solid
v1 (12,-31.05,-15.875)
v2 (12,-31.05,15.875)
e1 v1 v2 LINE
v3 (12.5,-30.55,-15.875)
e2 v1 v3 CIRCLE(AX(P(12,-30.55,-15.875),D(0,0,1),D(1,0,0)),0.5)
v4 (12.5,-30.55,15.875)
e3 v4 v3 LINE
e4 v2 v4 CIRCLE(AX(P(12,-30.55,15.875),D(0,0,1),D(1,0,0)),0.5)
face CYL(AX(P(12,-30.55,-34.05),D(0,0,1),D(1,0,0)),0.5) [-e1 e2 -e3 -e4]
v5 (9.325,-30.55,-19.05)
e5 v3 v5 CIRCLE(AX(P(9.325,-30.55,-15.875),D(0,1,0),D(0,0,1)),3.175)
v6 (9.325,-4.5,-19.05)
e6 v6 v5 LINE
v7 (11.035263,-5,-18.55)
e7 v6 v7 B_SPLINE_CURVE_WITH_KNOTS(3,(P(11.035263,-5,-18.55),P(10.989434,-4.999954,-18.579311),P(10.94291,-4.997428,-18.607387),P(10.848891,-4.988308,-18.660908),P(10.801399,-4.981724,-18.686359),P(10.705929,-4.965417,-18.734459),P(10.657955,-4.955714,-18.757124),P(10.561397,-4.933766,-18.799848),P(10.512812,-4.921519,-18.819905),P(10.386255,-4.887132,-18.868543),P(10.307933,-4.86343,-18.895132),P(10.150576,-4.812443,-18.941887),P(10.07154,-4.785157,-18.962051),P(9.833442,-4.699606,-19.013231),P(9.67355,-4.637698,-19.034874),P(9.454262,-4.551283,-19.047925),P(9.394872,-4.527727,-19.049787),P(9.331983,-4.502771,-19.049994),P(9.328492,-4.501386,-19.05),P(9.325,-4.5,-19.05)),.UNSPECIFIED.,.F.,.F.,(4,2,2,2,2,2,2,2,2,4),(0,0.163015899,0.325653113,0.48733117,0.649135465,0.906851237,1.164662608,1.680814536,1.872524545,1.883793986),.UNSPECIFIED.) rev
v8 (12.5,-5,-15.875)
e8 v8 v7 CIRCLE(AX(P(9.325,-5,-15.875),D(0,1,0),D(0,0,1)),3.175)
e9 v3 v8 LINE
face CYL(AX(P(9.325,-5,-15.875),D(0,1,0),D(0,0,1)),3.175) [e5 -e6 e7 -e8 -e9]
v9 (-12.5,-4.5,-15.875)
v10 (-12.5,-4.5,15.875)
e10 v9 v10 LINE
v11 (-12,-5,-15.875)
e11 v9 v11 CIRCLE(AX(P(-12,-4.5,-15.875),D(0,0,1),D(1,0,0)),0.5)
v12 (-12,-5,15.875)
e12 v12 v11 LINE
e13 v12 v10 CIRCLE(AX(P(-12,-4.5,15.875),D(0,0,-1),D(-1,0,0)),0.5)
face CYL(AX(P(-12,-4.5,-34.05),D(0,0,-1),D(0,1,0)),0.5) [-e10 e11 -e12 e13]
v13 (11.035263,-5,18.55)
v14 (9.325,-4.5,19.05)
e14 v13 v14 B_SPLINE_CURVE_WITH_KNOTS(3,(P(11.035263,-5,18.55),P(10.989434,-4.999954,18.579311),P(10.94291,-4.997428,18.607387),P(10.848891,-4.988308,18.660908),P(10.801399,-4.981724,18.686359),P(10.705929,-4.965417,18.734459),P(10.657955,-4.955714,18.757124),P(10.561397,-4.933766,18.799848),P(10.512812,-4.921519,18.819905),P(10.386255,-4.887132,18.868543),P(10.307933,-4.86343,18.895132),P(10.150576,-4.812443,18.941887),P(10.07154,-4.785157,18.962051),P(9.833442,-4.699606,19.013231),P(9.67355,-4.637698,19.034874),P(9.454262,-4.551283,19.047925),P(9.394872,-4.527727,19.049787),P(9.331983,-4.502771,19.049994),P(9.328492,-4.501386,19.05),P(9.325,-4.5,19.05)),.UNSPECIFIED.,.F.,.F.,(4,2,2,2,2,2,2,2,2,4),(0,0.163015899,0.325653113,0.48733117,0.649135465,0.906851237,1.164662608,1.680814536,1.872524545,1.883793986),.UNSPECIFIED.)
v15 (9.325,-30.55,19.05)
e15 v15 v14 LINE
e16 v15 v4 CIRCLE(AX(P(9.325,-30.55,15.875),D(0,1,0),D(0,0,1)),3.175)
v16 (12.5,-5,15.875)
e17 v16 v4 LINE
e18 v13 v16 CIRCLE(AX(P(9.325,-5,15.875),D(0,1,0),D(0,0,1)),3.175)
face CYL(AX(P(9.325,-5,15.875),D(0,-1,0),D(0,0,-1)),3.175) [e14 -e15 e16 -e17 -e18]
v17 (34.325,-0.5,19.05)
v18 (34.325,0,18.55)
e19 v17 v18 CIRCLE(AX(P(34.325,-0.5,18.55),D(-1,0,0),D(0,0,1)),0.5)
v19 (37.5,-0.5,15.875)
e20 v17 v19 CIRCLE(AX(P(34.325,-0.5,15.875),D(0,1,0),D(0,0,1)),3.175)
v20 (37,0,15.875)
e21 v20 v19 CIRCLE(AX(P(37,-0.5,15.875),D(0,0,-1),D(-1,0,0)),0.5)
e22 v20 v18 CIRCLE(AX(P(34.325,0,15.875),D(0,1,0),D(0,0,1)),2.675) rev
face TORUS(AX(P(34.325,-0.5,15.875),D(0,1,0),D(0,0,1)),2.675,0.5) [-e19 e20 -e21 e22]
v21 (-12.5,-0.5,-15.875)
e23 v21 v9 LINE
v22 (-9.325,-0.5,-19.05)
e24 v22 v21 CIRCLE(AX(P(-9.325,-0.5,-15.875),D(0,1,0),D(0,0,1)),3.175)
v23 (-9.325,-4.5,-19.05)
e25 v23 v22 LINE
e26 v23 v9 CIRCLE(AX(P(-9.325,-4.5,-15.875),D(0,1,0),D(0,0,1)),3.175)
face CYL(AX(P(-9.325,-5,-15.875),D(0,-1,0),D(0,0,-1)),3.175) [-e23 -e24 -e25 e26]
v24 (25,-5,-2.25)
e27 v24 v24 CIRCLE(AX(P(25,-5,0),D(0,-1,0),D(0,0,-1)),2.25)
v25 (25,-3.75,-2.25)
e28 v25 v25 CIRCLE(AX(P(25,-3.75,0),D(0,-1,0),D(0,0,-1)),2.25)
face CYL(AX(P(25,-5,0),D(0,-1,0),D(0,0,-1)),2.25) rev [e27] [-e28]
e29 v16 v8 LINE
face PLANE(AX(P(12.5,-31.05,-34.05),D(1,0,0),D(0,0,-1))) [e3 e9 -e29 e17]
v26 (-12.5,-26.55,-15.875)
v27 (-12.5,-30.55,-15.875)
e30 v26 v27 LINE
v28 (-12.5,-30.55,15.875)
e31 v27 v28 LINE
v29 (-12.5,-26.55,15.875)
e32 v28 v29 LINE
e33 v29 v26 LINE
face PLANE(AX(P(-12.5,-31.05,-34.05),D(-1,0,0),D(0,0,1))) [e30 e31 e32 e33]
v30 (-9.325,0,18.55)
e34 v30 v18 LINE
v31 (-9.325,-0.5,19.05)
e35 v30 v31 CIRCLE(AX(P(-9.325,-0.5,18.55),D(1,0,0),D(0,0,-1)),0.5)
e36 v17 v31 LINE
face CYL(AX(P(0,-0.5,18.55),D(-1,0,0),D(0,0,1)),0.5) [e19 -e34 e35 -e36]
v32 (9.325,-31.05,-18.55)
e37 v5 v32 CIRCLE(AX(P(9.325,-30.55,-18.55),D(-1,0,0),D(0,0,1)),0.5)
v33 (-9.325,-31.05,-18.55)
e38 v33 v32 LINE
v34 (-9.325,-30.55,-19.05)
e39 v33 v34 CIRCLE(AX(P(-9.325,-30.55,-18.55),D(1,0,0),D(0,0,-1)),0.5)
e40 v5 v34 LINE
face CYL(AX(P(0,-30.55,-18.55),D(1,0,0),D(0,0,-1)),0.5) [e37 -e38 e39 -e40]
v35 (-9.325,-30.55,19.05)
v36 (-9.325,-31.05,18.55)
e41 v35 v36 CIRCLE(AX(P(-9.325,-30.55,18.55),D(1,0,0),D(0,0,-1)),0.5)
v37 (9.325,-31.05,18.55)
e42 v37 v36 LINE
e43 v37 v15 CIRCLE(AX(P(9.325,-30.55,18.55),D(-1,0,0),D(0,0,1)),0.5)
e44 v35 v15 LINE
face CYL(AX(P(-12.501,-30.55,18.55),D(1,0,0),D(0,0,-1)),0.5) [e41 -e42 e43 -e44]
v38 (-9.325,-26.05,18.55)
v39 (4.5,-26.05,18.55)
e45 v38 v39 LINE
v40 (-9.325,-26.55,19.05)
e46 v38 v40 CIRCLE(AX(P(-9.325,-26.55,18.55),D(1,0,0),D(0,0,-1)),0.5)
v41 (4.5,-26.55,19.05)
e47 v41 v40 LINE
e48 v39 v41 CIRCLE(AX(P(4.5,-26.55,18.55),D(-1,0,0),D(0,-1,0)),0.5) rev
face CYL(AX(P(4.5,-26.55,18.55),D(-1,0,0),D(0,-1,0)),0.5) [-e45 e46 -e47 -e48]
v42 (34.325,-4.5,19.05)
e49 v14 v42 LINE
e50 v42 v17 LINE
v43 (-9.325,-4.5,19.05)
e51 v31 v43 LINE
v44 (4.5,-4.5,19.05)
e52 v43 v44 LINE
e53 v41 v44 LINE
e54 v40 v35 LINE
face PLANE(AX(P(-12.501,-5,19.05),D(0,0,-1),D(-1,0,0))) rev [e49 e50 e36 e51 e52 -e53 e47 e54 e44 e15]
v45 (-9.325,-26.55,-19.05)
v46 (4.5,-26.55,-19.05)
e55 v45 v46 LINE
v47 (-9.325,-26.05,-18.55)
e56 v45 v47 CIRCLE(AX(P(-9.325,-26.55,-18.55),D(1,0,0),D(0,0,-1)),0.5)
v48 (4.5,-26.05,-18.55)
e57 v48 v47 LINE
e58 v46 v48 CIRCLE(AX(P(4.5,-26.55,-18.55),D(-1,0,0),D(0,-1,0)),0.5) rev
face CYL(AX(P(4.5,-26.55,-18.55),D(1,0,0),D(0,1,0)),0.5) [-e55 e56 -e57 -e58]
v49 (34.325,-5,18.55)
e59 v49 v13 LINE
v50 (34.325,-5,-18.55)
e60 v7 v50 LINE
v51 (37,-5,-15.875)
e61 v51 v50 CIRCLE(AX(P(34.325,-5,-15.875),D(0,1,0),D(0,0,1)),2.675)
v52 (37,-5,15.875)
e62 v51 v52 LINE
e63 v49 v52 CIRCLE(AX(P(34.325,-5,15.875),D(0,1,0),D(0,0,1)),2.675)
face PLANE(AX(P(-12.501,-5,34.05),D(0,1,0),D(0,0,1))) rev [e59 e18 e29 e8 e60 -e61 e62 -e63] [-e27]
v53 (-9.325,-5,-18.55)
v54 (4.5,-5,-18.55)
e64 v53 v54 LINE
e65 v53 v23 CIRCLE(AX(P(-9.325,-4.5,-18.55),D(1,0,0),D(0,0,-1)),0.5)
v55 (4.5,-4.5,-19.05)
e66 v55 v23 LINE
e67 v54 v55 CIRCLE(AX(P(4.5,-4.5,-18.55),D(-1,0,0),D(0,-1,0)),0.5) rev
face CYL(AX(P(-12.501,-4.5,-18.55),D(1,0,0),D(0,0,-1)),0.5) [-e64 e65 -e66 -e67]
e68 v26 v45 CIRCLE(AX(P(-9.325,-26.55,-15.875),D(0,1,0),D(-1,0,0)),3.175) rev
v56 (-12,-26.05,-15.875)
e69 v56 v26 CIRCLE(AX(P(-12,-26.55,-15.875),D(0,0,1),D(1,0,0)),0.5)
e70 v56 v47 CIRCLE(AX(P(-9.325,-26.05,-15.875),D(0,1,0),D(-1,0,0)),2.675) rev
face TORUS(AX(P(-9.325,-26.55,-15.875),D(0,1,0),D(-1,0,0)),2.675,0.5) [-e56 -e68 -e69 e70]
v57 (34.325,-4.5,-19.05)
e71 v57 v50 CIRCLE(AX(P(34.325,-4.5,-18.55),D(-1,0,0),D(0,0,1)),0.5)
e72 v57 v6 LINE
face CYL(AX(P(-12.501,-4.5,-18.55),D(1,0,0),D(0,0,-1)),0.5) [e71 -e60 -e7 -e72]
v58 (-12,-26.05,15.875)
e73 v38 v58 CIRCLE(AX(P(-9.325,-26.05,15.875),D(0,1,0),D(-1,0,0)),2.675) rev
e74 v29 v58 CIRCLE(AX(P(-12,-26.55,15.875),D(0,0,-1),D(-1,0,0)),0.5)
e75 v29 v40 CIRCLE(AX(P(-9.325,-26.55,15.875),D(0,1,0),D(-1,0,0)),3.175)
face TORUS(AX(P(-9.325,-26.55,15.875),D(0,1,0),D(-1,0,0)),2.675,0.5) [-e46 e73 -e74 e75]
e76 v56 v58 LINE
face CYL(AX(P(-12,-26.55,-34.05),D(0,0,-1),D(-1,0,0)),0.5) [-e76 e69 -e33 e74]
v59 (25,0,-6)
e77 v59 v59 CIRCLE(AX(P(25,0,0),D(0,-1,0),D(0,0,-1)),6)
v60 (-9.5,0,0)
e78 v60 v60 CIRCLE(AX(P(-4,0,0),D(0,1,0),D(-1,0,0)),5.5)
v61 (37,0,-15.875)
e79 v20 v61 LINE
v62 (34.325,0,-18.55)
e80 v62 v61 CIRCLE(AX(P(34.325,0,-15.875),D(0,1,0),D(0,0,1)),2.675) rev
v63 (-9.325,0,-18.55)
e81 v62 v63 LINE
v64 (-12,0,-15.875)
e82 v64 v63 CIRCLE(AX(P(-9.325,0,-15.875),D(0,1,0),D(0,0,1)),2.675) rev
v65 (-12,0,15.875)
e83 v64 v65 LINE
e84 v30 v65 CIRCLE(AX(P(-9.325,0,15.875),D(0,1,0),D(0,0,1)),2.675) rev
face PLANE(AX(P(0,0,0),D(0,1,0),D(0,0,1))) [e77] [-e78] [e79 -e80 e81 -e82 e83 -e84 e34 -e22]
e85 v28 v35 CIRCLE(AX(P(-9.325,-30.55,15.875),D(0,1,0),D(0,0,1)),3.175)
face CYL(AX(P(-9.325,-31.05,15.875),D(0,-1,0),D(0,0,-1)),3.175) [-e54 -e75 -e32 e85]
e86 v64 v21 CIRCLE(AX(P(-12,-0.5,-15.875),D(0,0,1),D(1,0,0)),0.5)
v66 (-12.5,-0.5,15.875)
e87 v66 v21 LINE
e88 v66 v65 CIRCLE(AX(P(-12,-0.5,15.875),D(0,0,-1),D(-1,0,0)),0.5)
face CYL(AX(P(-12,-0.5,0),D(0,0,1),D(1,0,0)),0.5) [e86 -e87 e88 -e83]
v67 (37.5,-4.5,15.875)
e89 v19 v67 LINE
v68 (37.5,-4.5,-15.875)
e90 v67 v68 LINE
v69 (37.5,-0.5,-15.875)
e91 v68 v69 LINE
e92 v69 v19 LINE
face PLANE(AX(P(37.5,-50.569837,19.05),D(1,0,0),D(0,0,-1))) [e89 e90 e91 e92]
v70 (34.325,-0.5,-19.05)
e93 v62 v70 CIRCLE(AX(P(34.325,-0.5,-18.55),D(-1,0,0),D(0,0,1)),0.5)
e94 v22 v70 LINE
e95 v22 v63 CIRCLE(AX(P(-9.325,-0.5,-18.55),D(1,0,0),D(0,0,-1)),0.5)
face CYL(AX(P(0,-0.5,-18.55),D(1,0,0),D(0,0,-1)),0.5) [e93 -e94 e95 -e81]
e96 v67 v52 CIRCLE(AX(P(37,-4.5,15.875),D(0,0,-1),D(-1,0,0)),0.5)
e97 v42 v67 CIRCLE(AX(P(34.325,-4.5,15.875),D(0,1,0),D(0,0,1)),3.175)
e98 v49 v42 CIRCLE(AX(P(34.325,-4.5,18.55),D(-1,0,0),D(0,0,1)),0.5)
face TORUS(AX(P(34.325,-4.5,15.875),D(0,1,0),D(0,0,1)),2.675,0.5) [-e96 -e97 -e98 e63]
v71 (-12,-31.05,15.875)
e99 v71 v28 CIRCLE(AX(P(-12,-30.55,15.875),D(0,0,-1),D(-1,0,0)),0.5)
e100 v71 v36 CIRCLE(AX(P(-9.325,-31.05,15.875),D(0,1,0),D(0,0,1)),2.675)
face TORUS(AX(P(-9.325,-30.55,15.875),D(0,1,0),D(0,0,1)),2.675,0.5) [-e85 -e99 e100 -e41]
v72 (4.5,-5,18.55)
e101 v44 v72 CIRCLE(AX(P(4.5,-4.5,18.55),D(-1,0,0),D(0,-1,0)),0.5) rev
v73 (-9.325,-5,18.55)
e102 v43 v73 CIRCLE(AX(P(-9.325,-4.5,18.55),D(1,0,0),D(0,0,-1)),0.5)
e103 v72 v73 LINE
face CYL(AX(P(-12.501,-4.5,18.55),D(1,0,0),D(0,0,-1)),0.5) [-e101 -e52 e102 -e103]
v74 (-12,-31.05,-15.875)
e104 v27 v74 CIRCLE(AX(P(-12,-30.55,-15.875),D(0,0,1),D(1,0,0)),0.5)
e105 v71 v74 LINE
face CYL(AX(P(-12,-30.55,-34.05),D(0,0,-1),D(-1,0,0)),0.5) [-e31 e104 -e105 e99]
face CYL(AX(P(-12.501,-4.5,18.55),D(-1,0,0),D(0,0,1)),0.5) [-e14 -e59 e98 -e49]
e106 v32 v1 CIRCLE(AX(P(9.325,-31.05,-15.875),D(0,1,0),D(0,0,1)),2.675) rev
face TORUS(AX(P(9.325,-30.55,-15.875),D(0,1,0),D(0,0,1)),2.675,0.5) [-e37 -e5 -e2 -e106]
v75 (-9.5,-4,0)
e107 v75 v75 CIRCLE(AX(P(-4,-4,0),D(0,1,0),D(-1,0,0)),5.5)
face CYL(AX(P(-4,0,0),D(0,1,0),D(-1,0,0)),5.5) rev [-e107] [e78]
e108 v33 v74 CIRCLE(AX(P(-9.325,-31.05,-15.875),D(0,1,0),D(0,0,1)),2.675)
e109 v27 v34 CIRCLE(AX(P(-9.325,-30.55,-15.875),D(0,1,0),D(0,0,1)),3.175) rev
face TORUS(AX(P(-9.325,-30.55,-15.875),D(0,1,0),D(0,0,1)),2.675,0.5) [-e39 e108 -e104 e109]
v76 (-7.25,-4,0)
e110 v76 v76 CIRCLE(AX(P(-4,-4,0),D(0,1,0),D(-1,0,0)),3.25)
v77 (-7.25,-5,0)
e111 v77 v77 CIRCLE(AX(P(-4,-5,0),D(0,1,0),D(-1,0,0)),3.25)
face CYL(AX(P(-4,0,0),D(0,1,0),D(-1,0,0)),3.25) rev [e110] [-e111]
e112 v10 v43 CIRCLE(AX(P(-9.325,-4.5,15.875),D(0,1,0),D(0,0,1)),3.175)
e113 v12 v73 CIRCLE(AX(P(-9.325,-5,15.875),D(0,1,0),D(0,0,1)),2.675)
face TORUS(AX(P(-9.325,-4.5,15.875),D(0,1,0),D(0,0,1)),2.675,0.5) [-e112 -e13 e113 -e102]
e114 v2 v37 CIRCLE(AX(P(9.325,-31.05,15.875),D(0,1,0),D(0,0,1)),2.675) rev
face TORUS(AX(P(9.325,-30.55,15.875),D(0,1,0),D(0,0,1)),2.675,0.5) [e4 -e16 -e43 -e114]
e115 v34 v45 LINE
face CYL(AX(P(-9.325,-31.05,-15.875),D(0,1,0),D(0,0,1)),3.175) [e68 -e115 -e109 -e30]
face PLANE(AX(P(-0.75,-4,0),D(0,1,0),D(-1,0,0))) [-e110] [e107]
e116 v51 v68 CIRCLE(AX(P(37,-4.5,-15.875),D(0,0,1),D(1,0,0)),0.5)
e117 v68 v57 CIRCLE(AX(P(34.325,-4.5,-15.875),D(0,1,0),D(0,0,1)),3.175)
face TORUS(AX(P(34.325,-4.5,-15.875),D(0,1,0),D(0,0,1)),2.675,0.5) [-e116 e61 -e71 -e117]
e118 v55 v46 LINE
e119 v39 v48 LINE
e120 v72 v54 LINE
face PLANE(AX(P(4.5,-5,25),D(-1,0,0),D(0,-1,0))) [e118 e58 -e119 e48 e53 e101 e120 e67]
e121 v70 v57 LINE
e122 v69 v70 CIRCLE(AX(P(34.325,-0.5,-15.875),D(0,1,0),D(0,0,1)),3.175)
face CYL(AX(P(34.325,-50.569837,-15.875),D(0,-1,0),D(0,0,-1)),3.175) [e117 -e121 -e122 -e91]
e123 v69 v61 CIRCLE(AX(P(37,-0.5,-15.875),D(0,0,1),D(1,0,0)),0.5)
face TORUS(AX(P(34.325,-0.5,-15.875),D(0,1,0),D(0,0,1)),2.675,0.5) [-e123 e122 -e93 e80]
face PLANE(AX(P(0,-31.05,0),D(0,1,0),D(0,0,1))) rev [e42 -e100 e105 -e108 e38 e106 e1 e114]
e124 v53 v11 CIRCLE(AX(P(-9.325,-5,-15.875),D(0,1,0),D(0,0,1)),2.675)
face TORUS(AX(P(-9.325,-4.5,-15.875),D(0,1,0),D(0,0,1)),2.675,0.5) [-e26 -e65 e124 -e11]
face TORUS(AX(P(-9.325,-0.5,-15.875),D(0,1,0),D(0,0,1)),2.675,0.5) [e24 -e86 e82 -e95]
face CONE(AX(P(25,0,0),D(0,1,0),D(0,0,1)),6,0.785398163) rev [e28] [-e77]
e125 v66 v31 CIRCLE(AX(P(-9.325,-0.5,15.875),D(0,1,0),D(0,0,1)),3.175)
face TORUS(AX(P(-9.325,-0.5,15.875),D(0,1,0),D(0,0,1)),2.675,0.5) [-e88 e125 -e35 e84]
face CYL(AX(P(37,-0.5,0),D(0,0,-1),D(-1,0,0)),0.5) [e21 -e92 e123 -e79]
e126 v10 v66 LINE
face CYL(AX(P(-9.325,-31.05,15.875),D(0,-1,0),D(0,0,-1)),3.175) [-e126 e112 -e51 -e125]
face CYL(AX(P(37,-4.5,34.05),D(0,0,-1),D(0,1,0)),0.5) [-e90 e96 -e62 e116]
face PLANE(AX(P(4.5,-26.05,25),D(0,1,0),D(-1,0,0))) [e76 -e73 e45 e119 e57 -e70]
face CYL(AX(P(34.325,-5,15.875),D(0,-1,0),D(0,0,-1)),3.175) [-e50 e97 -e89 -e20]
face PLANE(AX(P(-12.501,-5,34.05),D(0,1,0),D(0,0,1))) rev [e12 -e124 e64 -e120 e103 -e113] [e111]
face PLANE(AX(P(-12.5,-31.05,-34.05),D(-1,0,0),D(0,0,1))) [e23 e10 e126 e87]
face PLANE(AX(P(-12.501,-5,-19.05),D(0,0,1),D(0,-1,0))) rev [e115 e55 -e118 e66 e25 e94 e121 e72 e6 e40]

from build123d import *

# Parameters (mm, degrees)
SKETCH1_W           = 25
SKETCH1_H           = 68.1
BOSS_EXTRUDE1_DEPTH = 31.05
CUT_EXTRUDE1_REACH  = 54.426
SKETCH2_W           = 15
SKETCH2_H           = 26.05
SKETCH3_W           = 17
SKETCH3_H           = 21.05
CUT_EXTRUDE2_DEPTH  = 25
SKETCH7_W           = 25
SKETCH7_H           = 38.1
BOSS_EXTRUDE2_DEPTH = 5
SKETCH11_W          = 25
SKETCH11_H          = 15
CUT_EXTRUDE3_DEPTH  = 5
FILLET1_R           = 3.175
FILLET2_R           = 0.5
FILLET3_R           = 3.175


with BuildPart() as part:
    # Sketch1 → Boss-Extrude1 (new body)
    with BuildSketch(Plane(origin=(0, 0, 0), x_dir=(1, 0, 0), z_dir=(0, 1, 0))):
        Rectangle(SKETCH1_W, SKETCH1_H)
    extrude(amount=-BOSS_EXTRUDE1_DEPTH)

    # Sketch2 → Cut-Extrude1 (cut, up to next)
    with BuildSketch(Plane(origin=(12.5, 0, 0), x_dir=(0, 0, -1), z_dir=(1, 0, 0)), mode=Mode.PRIVATE) as cut_extrude1_sk1:
        with Locations((-26.55, -18.025)):
            Rectangle(SKETCH2_W, SKETCH2_H)
    cut_extrude1_tool1 = extrude(cut_extrude1_sk1.sketch, amount=-CUT_EXTRUDE1_REACH, mode=Mode.PRIVATE) & part.part
    # Sketch2 → Cut-Extrude1 (cut, up to next)
    with BuildSketch(Plane(origin=(12.5, 0, 0), x_dir=(0, 0, -1), z_dir=(1, 0, 0)), mode=Mode.PRIVATE) as cut_extrude1_sk2:
        with Locations((26.55, -18.025)):
            Rectangle(SKETCH2_W, SKETCH2_H)
    cut_extrude1_tool2 = extrude(cut_extrude1_sk2.sketch, amount=-CUT_EXTRUDE1_REACH, mode=Mode.PRIVATE) & part.part
    add(cut_extrude1_tool1.solids().sort_by_distance((12.5, -18.025, 26.55))[0], mode=Mode.SUBTRACT)
    add(cut_extrude1_tool2.solids().sort_by_distance((12.5, -18.025, -26.55))[0], mode=Mode.SUBTRACT)

    # Sketch3 → Cut-Extrude2 (cut, symmetric)
    with BuildSketch(Plane.XY):
        with Locations((-4, -15.525)):
            Rectangle(SKETCH3_W, SKETCH3_H)
    extrude(amount=CUT_EXTRUDE2_DEPTH, both=True, mode=Mode.SUBTRACT)

    # Sketch6 → Cut-Revolve2 (revolve, cut)
    with BuildSketch(Plane.XY, mode=Mode.PRIVATE) as cut_revolve2_sk:
        Polygon((-4, 0), (-4, -5), (-0.75, -5), (-0.75, -4), (1.5, -4), (1.5, 0), align=None)
    revolve(cut_revolve2_sk.sketch.rotate(Axis((-4, 0, 0), (0, -1, 0)), 180), axis=Axis((-4, 0, 0), (0, -1, 0)), mode=Mode.SUBTRACT)

    # Sketch7 → Boss-Extrude2 (add)
    with BuildSketch(Plane(origin=(0, 0, 0), x_dir=(1, 0, 0), z_dir=(0, 1, 0))):
        with Locations((25, 0)):
            Rectangle(SKETCH7_W, SKETCH7_H)
    extrude(amount=-BOSS_EXTRUDE2_DEPTH)

    # Sketch10 → Cut-Revolve3 (revolve, cut)
    with BuildSketch(Plane.XY, mode=Mode.PRIVATE) as cut_revolve3_sk:
        Polygon((25, 0), (19, 0), (22.75, -3.75), (22.75, -5), (25, -5), align=None)
    revolve(cut_revolve3_sk.sketch.rotate(Axis((25, -5, 0), (0, 1, 0)), 270), axis=Axis((25, -5, 0), (0, 1, 0)), mode=Mode.SUBTRACT)

    # Sketch11 → Cut-Extrude3 (cut)
    with BuildSketch(Plane(origin=(0, 0, 0), x_dir=(1, 0, 0), z_dir=(0, 1, 0))):
        with Locations((0, 26.55)):
            Rectangle(SKETCH11_W, SKETCH11_H)
        with Locations((0, -26.55)):
            Rectangle(SKETCH11_W, SKETCH11_H)
    extrude(amount=-CUT_EXTRUDE3_DEPTH, mode=Mode.SUBTRACT)

    # Fillet1
    fillet1_edges = [part.edges().sort_by_distance(p)[0] for p in [
        (12.5, -18.025, 19.05),
        (12.5, -18.025, -19.05),
    ]]
    fillet(fillet1_edges, radius=FILLET1_R)

    # Fillet2
    fillet2_edges = [part.edges().sort_by_distance(p)[0] for p in [
        (-4, -5, 19.05),
        (12.5, -31.05, 0),
        (11.57006403, -31.05, -18.12006403),
        (11.57006403, -31.05, 18.12006403),
        (-12.5, -31.05, 0),
        (-1.5875, -31.05, 19.05),
        (-1.5875, -31.05, -19.05),
        (-4, -26.05, 19.05),
        (-12.5, -26.05, 0),
        (-4, -26.05, -19.05),
        (12.5, 0, -19.05),
        (12.5, 0, 19.05),
        (37.5, 0, 0),
        (23.4125, -5, -19.05),
        (37.5, -5, 0),
        (23.4125, -5, 19.05),
        (-12.5, -5, 0),
        (-4, -5, -19.05),
        (-12.5, 0, 0),
    ]]
    fillet(fillet2_edges, radius=FILLET2_R)

    # Fillet3
    # the kernel refuses this fillet: 3.175 mm, written as the material it takes off along each edge
    with BuildSketch(Plane(origin=(-9.325, -31.05, -15.875), x_dir=(-1, 0, 0), z_dir=(0, 0, 1))) as fillet3_piece_1:
        with BuildLine():
            CenterArc((2.675, -0.5), 0.5, 0, 90)
            Line((3.175, -0.5), (3.175, 0))
            Line((3.175, 0), (2.675, 0))
        make_face()
    revolve(axis=Axis((-9.325, -31.05, -15.875), (0, -1, 0)), revolution_arc=90, mode=Mode.SUBTRACT)
    with BuildSketch(Plane(origin=(-9.325, -31.05, 15.875), x_dir=(0, 0, 1), z_dir=(1, 0, 0))) as fillet3_piece_2:
        with BuildLine():
            CenterArc((2.675, -0.5), 0.5, 0, 90)
            Line((3.175, -0.5), (3.175, 0))
            Line((3.175, 0), (2.675, 0))
        make_face()
    revolve(axis=Axis((-9.325, -31.05, 15.875), (0, -1, 0)), revolution_arc=90, mode=Mode.SUBTRACT)
    with BuildSketch(Plane(origin=(-9.325, -26.05, -15.875), x_dir=(0, 0, -1), z_dir=(1, 0, 0))) as fillet3_piece_3:
        with BuildLine():
            CenterArc((2.675, -0.5), 0.5, 0, 90)
            Line((3.175, -0.5), (3.175, 0))
            Line((3.175, 0), (2.675, 0))
        make_face()
    revolve(axis=Axis((-9.325, -26.05, -15.875), (0, 1, 0)), revolution_arc=90, mode=Mode.SUBTRACT)
    with BuildSketch(Plane(origin=(-9.325, -26.05, 15.875), x_dir=(-1, 0, 0), z_dir=(0, 0, -1))) as fillet3_piece_4:
        with BuildLine():
            CenterArc((2.675, -0.5), 0.5, 0, 90)
            Line((3.175, -0.5), (3.175, 0))
            Line((3.175, 0), (2.675, 0))
        make_face()
    revolve(axis=Axis((-9.325, -26.05, 15.875), (0, 1, 0)), revolution_arc=90, mode=Mode.SUBTRACT)
    with BuildSketch(Plane(origin=(-9.325, 0, 15.875), x_dir=(-1, 0, 0), z_dir=(0, 0, -1))) as fillet3_piece_5:
        with BuildLine():
            CenterArc((2.675, -0.5), 0.5, 0, 90)
            Line((3.175, -0.5), (3.175, 0))
            Line((3.175, 0), (2.675, 0))
        make_face()
    revolve(axis=Axis((-9.325, 0, 15.875), (0, 1, 0)), revolution_arc=90, mode=Mode.SUBTRACT)
    with BuildSketch(Plane(origin=(-9.325, 0, -15.875), x_dir=(0, 0, -1), z_dir=(1, 0, 0))) as fillet3_piece_6:
        with BuildLine():
            CenterArc((2.675, -0.5), 0.5, 0, 90)
            Line((3.175, -0.5), (3.175, 0))
            Line((3.175, 0), (2.675, 0))
        make_face()
    revolve(axis=Axis((-9.325, 0, -15.875), (0, 1, 0)), revolution_arc=90, mode=Mode.SUBTRACT)
    with BuildSketch(Plane(origin=(34.325, 0, 15.875), x_dir=(0, 0, 1), z_dir=(-1, 0, 0))) as fillet3_piece_7:
        with BuildLine():
            CenterArc((2.675, -0.5), 0.5, 0, 90)
            Line((3.175, -0.5), (3.175, 0))
            Line((3.175, 0), (2.675, 0))
        make_face()
    revolve(axis=Axis((34.325, 0, 15.875), (0, 1, 0)), revolution_arc=90, mode=Mode.SUBTRACT)
    with BuildSketch(Plane(origin=(34.325, 0, -15.875), x_dir=(1, 0, 0), z_dir=(0, 0, 1))) as fillet3_piece_8:
        with BuildLine():
            CenterArc((2.675, -0.5), 0.5, 0, 90)
            Line((3.175, -0.5), (3.175, 0))
            Line((3.175, 0), (2.675, 0))
        make_face()
    revolve(axis=Axis((34.325, 0, -15.875), (0, 1, 0)), revolution_arc=90, mode=Mode.SUBTRACT)
    with BuildSketch(Plane(origin=(-9.325, -5, 15.875), x_dir=(0, 0, 1), z_dir=(1, 0, 0))) as fillet3_piece_9:
        with BuildLine():
            CenterArc((2.675, -0.5), 0.5, 0, 90)
            Line((3.175, -0.5), (3.175, 0))
            Line((3.175, 0), (2.675, 0))
        make_face()
    revolve(axis=Axis((-9.325, -5, 15.875), (0, -1, 0)), revolution_arc=90, mode=Mode.SUBTRACT)
    with BuildSketch(Plane(origin=(-9.325, -5, -15.875), x_dir=(-1, 0, 0), z_dir=(0, 0, 1))) as fillet3_piece_10:
        with BuildLine():
            CenterArc((2.675, -0.5), 0.5, 0, 90)
            Line((3.175, -0.5), (3.175, 0))
            Line((3.175, 0), (2.675, 0))
        make_face()
    revolve(axis=Axis((-9.325, -5, -15.875), (0, -1, 0)), revolution_arc=90, mode=Mode.SUBTRACT)
    with BuildSketch(Plane(origin=(34.325, -5, -15.875), x_dir=(0, 0, -1), z_dir=(-1, 0, 0))) as fillet3_piece_11:
        with BuildLine():
            CenterArc((2.675, -0.5), 0.5, 0, 90)
            Line((3.175, -0.5), (3.175, 0))
            Line((3.175, 0), (2.675, 0))
        make_face()
    revolve(axis=Axis((34.325, -5, -15.875), (0, -1, 0)), revolution_arc=90, mode=Mode.SUBTRACT)
    with BuildSketch(Plane(origin=(34.325, -5, 15.875), x_dir=(1, 0, 0), z_dir=(0, 0, -1))) as fillet3_piece_12:
        with BuildLine():
            CenterArc((2.675, -0.5), 0.5, 0, 90)
            Line((3.175, -0.5), (3.175, 0))
            Line((3.175, 0), (2.675, 0))
        make_face()
    revolve(axis=Axis((34.325, -5, 15.875), (0, -1, 0)), revolution_arc=90, mode=Mode.SUBTRACT)
    with BuildSketch(Plane(origin=(37.5, 0, 19.05), x_dir=(0, 0, -1), z_dir=(0, -1, 0)), Plane(origin=(-12.5, -31.05, 19.05), x_dir=(0, 0, -1), z_dir=(0, 1, 0)), Plane(origin=(-12.5, -31.05, -19.05), x_dir=(1, 0, 0), z_dir=(0, 1, 0)), Plane(origin=(37.5, 0, -19.05), x_dir=(-1, 0, 0), z_dir=(0, -1, 0))) as fillet3_piece_13:
        with BuildLine():
            CenterArc((FILLET3_R, -FILLET3_R), FILLET3_R, 90, 90)
            Line((0, -FILLET3_R), (0, 0))
            Line((0, 0), (FILLET3_R, 0))
        make_face()
    extrude(amount=5, mode=Mode.SUBTRACT)
    with BuildSketch(Plane(origin=(-12.5, 0, 19.05), x_dir=(0, 0, -1), z_dir=(0, -1, 0)), Plane(origin=(-12.5, 0, -19.05), x_dir=(1, 0, 0), z_dir=(0, -1, 0))) as fillet3_piece_14:
        with BuildLine():
            CenterArc((FILLET3_R, FILLET3_R), FILLET3_R, 180, 90)
            Line((0, FILLET3_R), (0, 0))
            Line((0, 0), (FILLET3_R, 0))
        make_face()
    extrude(amount=5, mode=Mode.SUBTRACT)


solid = part.part
